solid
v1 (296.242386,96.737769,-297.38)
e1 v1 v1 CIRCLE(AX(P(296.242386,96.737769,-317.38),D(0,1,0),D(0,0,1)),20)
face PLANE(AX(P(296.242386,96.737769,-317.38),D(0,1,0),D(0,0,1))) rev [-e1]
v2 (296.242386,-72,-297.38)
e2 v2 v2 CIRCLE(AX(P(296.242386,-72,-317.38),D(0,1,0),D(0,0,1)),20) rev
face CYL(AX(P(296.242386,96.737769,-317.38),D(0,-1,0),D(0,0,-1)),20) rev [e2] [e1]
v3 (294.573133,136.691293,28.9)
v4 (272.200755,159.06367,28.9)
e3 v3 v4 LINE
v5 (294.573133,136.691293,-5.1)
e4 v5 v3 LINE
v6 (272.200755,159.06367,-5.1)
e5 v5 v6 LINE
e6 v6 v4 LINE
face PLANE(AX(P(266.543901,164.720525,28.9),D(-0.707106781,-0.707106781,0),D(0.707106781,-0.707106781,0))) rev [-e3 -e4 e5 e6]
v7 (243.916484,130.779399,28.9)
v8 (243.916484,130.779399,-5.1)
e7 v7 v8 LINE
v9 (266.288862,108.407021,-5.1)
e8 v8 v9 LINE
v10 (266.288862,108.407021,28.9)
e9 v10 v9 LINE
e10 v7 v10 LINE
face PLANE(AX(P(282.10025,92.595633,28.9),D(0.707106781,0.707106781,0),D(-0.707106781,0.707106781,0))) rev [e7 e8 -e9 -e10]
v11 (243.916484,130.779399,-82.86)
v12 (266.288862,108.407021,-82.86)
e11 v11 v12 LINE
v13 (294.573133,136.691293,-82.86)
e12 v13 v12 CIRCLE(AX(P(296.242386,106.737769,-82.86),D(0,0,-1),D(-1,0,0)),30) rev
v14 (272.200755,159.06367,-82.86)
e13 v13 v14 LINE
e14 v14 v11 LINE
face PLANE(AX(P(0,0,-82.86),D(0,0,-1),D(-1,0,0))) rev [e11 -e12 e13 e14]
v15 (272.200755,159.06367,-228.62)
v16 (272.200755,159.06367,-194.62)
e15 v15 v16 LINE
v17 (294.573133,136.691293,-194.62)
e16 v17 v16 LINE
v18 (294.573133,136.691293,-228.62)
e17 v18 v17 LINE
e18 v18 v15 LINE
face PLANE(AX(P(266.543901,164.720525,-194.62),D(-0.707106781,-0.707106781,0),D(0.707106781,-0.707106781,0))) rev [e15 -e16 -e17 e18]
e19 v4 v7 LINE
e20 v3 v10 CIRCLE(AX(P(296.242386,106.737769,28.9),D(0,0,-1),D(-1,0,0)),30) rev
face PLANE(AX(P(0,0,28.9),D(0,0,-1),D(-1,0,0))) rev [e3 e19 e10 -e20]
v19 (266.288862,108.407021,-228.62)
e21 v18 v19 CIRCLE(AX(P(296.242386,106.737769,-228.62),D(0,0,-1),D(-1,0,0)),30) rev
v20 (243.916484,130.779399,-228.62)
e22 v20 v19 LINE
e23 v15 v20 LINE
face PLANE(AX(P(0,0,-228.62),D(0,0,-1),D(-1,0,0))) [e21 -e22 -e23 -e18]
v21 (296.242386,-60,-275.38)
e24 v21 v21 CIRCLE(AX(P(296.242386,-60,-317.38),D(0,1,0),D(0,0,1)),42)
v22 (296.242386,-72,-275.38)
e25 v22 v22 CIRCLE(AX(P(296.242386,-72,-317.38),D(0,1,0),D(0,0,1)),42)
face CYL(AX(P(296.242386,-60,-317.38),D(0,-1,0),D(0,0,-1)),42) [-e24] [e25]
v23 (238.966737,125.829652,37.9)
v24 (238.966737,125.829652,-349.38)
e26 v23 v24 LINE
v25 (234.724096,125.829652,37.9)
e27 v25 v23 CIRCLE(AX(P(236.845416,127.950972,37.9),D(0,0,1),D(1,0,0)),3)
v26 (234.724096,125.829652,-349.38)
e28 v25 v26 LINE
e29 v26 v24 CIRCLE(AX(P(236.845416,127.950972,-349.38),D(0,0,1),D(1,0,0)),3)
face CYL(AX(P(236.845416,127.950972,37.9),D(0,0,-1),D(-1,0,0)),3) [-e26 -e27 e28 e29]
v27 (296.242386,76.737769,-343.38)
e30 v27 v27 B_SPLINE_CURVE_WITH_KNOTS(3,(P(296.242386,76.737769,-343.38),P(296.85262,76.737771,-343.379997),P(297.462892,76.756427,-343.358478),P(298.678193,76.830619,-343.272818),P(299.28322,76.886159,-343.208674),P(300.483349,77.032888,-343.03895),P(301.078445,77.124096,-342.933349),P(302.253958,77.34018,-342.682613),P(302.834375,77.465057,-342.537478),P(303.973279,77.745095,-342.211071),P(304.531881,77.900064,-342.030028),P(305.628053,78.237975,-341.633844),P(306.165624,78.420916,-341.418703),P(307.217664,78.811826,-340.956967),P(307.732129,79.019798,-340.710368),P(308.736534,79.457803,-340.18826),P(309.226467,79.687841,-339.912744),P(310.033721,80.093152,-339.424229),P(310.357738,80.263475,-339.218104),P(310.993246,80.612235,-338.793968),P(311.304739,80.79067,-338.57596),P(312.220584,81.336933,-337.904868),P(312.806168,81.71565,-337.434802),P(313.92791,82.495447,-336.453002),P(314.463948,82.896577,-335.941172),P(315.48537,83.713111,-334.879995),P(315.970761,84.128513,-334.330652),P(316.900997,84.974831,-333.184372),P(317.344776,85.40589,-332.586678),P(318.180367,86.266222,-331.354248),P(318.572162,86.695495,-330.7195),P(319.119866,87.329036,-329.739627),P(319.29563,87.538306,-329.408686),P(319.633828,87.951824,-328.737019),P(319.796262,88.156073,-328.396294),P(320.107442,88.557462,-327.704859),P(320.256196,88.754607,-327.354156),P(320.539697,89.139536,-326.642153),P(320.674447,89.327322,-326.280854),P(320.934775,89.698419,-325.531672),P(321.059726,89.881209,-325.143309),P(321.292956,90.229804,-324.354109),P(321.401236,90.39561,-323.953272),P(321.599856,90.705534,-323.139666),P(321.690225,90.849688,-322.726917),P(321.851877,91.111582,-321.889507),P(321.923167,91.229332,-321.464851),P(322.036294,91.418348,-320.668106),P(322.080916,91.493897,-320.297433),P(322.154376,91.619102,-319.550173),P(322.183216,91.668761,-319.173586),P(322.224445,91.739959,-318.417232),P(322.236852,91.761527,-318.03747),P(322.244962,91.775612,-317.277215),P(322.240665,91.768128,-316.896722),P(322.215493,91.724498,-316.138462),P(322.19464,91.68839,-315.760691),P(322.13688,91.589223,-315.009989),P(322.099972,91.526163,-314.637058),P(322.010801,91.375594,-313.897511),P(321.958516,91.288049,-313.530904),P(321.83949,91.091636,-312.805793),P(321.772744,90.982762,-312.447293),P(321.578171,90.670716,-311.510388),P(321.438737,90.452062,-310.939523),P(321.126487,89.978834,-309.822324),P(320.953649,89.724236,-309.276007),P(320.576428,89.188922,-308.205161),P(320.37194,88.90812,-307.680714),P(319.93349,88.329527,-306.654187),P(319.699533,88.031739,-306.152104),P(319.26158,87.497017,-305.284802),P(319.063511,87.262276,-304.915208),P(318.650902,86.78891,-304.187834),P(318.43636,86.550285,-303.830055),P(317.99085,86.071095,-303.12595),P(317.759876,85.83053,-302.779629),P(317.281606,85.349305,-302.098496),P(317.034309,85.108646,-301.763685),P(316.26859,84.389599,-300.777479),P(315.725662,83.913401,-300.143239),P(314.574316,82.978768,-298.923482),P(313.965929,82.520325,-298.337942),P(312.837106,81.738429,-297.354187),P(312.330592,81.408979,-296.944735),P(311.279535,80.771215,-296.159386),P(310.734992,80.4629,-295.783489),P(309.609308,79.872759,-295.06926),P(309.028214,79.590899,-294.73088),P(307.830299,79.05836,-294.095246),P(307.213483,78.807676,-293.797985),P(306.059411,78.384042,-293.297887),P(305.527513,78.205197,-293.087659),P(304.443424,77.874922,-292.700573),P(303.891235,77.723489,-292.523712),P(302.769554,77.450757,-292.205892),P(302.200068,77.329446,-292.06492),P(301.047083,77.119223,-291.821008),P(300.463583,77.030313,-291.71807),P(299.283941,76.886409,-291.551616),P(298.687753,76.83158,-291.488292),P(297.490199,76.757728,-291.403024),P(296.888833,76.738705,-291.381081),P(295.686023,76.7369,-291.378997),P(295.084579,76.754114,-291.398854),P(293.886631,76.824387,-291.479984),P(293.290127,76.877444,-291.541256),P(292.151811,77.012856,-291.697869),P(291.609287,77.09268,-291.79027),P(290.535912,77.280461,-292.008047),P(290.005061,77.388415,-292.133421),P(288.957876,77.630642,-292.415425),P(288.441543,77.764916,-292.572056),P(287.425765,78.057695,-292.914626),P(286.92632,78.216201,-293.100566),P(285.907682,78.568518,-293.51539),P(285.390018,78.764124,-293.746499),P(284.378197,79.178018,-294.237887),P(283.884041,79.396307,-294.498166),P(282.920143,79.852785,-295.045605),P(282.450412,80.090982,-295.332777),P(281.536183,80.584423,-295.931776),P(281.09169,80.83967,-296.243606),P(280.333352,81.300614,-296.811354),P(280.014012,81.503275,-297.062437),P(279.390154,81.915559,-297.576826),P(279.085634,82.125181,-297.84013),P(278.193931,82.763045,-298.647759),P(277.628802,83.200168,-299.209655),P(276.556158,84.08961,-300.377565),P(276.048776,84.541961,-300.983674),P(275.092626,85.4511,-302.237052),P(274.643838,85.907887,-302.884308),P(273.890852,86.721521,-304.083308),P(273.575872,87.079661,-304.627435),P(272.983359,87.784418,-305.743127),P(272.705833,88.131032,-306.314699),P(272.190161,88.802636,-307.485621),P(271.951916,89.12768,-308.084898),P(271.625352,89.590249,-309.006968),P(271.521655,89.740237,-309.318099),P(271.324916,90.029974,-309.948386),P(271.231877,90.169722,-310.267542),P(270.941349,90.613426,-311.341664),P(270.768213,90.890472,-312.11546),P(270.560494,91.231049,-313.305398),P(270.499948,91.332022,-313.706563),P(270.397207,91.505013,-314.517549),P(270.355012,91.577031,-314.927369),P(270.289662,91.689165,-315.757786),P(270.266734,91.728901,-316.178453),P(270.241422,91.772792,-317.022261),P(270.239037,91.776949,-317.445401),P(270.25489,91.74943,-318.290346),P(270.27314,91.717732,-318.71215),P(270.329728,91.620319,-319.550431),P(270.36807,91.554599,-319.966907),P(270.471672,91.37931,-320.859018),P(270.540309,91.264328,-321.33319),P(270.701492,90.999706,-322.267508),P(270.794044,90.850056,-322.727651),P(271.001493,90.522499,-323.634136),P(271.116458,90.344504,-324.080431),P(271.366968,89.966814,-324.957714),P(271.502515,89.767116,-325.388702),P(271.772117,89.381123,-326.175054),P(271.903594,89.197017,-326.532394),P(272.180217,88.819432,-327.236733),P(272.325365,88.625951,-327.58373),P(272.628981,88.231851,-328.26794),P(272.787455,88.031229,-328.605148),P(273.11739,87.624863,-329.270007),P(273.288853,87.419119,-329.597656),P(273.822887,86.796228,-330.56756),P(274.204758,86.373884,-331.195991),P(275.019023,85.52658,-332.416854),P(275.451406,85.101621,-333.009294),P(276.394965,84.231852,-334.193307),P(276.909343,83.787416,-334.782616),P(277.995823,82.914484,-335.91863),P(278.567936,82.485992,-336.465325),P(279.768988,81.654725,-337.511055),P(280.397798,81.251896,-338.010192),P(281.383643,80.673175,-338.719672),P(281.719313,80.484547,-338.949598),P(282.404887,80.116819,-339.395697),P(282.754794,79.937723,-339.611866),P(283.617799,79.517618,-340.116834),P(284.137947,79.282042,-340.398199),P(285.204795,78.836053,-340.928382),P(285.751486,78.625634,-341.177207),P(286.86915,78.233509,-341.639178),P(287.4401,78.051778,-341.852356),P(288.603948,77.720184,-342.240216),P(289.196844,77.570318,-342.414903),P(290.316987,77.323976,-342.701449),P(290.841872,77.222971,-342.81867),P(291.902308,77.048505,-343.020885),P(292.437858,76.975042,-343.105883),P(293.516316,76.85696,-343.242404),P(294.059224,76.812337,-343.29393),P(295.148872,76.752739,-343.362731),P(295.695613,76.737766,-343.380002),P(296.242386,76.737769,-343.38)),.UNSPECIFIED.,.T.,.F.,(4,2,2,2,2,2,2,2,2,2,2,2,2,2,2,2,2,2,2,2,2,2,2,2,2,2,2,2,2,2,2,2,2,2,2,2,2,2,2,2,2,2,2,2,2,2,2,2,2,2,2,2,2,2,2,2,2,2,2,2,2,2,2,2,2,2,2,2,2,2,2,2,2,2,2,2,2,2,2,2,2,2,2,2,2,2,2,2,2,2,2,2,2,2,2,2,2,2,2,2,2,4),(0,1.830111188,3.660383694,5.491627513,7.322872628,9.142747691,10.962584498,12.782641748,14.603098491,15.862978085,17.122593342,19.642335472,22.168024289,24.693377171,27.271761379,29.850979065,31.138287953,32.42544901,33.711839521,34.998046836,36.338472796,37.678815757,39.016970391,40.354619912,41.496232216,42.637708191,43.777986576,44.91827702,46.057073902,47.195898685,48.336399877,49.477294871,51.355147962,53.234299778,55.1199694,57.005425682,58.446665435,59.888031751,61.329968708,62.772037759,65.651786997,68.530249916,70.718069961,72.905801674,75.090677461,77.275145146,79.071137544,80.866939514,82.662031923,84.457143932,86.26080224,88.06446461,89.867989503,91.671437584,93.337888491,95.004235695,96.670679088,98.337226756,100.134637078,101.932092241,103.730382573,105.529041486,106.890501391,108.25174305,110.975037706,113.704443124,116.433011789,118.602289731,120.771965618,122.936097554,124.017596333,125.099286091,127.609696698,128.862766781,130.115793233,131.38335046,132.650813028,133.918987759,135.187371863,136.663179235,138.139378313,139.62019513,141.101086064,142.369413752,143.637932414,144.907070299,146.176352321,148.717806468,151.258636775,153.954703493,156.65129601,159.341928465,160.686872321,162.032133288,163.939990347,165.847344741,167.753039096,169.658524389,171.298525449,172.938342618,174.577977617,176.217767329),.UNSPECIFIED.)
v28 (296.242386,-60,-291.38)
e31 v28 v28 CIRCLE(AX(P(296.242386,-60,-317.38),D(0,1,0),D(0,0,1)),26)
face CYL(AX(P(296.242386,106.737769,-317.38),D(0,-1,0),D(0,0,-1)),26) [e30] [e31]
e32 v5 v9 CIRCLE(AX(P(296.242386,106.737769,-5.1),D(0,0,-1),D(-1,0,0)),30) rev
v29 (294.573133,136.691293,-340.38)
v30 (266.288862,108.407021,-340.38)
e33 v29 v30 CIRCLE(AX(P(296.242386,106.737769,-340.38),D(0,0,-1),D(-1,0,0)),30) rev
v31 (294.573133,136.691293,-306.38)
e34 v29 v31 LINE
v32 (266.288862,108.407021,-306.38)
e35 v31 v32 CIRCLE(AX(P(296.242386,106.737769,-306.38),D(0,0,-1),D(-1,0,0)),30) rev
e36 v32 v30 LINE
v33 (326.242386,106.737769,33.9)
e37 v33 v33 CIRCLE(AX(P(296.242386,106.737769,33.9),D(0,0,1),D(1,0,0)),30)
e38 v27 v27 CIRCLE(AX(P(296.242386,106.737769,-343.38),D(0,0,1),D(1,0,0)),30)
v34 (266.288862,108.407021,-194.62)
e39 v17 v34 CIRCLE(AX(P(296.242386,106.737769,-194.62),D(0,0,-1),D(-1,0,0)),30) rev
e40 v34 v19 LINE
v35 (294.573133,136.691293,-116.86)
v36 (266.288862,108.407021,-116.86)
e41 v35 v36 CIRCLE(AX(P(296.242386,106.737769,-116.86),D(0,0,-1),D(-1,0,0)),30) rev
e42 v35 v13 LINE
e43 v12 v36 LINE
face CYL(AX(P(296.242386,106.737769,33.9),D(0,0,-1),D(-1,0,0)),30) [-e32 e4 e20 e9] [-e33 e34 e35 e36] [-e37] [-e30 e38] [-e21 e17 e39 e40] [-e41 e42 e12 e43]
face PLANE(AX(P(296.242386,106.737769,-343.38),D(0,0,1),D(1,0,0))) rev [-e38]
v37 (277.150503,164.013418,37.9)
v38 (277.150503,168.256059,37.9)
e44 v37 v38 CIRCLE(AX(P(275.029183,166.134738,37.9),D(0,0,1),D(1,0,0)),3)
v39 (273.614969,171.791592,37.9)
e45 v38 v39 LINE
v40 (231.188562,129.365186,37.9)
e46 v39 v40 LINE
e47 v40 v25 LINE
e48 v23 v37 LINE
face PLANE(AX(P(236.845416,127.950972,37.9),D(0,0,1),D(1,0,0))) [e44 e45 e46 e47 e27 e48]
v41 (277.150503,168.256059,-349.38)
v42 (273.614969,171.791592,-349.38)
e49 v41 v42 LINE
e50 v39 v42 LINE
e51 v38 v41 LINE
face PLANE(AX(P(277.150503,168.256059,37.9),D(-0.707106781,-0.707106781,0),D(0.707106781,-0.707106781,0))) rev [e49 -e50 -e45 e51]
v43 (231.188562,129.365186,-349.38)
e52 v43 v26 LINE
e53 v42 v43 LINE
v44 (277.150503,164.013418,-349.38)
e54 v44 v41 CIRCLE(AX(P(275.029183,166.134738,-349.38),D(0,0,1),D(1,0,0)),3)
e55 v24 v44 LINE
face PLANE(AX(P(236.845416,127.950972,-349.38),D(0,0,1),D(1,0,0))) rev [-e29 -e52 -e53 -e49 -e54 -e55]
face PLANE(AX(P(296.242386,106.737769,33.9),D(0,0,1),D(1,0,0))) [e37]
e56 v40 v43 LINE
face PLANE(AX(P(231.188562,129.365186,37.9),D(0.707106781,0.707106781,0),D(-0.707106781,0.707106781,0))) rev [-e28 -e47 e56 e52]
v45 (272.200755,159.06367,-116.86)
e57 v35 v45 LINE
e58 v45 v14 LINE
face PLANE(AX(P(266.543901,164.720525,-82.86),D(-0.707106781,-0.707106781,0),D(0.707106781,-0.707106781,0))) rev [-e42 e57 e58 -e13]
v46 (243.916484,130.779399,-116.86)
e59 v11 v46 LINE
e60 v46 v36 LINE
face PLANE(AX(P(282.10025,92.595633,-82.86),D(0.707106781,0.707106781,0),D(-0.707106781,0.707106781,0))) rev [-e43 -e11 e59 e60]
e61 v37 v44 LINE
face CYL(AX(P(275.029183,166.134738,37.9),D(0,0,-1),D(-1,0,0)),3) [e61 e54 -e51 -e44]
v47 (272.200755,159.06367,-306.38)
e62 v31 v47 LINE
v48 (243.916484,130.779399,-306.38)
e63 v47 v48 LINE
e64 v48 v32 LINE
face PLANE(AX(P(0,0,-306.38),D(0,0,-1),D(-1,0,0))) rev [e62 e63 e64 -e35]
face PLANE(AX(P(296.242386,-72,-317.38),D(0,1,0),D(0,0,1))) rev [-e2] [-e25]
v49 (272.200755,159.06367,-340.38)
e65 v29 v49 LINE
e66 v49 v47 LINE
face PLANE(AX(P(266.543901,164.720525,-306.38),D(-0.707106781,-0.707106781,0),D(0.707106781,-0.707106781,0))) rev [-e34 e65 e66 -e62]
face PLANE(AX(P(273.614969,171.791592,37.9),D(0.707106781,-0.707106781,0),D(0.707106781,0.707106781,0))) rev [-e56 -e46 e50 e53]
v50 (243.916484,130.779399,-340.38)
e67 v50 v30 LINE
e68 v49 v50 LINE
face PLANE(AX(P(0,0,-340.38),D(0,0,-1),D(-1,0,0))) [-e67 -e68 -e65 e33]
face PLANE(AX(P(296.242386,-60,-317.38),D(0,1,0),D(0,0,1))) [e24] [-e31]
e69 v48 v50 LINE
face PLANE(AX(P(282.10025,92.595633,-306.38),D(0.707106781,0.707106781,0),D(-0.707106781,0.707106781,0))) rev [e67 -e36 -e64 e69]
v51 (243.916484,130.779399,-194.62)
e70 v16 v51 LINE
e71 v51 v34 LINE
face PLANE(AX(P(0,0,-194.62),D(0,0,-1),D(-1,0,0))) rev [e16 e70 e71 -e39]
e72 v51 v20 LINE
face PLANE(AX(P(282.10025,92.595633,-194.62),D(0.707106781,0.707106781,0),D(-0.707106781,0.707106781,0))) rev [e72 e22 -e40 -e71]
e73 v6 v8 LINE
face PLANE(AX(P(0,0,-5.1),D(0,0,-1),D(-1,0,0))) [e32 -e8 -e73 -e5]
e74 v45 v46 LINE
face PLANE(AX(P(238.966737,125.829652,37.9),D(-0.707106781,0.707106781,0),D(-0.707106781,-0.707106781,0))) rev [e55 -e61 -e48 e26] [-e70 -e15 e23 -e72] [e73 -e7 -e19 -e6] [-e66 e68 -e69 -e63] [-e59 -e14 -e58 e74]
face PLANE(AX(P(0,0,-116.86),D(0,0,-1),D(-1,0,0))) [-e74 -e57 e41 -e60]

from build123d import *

# Parameters (mm, degrees)
HEAD_START          = -349.38
HEAD_FLANGE_DEPTH   = 387.28
PRIMARY_START       = -5.1
PRIMARY_1_DEPTH     = 34
PRIMARY_START_2     = -116.86
PRIMARY_3_DEPTH     = 34
PRIMARY_START_3     = -228.62
PRIMARY_5_DEPTH     = 34
PRIMARY_START_4     = -340.38
PRIMARY_7_DEPTH     = 34
COLLECTOR_START     = -343.38
SKETCH6_R           = 30
COLLECTOR_DEPTH     = 377.28
OUTLET_START        = -60
SKETCH7_R           = 26
OUTLET_PIPE_DEPTH   = 166.73776862
OUTLET_START_2      = -72
SKETCH8_R           = 42
OUTLET_FLANGE_DEPTH = 12
OUTLET_START_3      = -73
SKETCH9_R           = 20
OUTLET_BORE_DEPTH   = 169.73776862


with BuildPart() as part:
    # Sketch1 → Head Flange (new body)
    with BuildSketch(Plane.XY.offset(HEAD_START)):
        with BuildLine():
            Line((231.188562109, 129.365185618), (234.724096015, 125.829651712))
            ThreePointArc((234.724096015, 125.829651712), (236.845416358, 124.950972056), (238.966736702, 125.829651712))
            Line((238.966736702, 125.829651712), (277.150502886, 164.013417896))
            ThreePointArc((277.150502886, 164.013417896), (278.029182543, 166.13473824), (277.150502886, 168.256058583))
            Line((277.150502886, 168.256058583), (273.61496898, 171.791592489))
            Line((273.61496898, 171.791592489), (231.188562109, 129.365185618))
        make_face()
    extrude(amount=HEAD_FLANGE_DEPTH)

    # Sketch2 → Primary 1 (add)
    with BuildSketch(Plane.XY.offset(PRIMARY_START)):
        Polygon((266.543901168, 164.720524677), (310.384521602, 120.879904244), (282.100250354, 92.595632996), (238.259629921, 136.43625343), align=None)
    extrude(amount=PRIMARY_1_DEPTH)

    # Sketch3 → Primary 3 (add)
    with BuildSketch(Plane.XY.offset(PRIMARY_START_2)):
        Polygon((266.543901168, 164.720524677), (310.384521602, 120.879904244), (282.100250354, 92.595632996), (238.259629921, 136.43625343), align=None)
    extrude(amount=PRIMARY_3_DEPTH)

    # Sketch4 → Primary 5 (add)
    with BuildSketch(Plane.XY.offset(PRIMARY_START_3)):
        Polygon((266.543901168, 164.720524677), (310.384521602, 120.879904244), (282.100250354, 92.595632996), (238.259629921, 136.43625343), align=None)
    extrude(amount=PRIMARY_5_DEPTH)

    # Sketch5 → Primary 7 (add)
    with BuildSketch(Plane.XY.offset(PRIMARY_START_4)):
        Polygon((266.543901168, 164.720524677), (310.384521602, 120.879904244), (282.100250354, 92.595632996), (238.259629921, 136.43625343), align=None)
    extrude(amount=PRIMARY_7_DEPTH)

    # Sketch6 → Collector (add)
    with BuildSketch(Plane.XY.offset(COLLECTOR_START)):
        with Locations((296.242385978, 106.73776862)):
            Circle(SKETCH6_R)
    extrude(amount=COLLECTOR_DEPTH)

    # Sketch7 → Outlet Pipe (add)
    with BuildSketch(Plane(origin=(0, 0, 0), x_dir=(1, 0, 0), z_dir=(0, 1, 0)).offset(OUTLET_START)):
        with Locations((296.242385978, 317.38)):
            Circle(SKETCH7_R)
    extrude(amount=OUTLET_PIPE_DEPTH)

    # Sketch8 → Outlet Flange (add)
    with BuildSketch(Plane(origin=(0, 0, 0), x_dir=(1, 0, 0), z_dir=(0, 1, 0)).offset(OUTLET_START_2)):
        with Locations((296.242385978, 317.38)):
            Circle(SKETCH8_R)
    extrude(amount=OUTLET_FLANGE_DEPTH)

    # Sketch9 → Outlet Bore (cut)
    with BuildSketch(Plane(origin=(0, 0, 0), x_dir=(1, 0, 0), z_dir=(0, 1, 0)).offset(OUTLET_START_3)):
        with Locations((296.242385978, 317.38)):
            Circle(SKETCH9_R)
    extrude(amount=OUTLET_BORE_DEPTH, mode=Mode.SUBTRACT)


solid = part.part
